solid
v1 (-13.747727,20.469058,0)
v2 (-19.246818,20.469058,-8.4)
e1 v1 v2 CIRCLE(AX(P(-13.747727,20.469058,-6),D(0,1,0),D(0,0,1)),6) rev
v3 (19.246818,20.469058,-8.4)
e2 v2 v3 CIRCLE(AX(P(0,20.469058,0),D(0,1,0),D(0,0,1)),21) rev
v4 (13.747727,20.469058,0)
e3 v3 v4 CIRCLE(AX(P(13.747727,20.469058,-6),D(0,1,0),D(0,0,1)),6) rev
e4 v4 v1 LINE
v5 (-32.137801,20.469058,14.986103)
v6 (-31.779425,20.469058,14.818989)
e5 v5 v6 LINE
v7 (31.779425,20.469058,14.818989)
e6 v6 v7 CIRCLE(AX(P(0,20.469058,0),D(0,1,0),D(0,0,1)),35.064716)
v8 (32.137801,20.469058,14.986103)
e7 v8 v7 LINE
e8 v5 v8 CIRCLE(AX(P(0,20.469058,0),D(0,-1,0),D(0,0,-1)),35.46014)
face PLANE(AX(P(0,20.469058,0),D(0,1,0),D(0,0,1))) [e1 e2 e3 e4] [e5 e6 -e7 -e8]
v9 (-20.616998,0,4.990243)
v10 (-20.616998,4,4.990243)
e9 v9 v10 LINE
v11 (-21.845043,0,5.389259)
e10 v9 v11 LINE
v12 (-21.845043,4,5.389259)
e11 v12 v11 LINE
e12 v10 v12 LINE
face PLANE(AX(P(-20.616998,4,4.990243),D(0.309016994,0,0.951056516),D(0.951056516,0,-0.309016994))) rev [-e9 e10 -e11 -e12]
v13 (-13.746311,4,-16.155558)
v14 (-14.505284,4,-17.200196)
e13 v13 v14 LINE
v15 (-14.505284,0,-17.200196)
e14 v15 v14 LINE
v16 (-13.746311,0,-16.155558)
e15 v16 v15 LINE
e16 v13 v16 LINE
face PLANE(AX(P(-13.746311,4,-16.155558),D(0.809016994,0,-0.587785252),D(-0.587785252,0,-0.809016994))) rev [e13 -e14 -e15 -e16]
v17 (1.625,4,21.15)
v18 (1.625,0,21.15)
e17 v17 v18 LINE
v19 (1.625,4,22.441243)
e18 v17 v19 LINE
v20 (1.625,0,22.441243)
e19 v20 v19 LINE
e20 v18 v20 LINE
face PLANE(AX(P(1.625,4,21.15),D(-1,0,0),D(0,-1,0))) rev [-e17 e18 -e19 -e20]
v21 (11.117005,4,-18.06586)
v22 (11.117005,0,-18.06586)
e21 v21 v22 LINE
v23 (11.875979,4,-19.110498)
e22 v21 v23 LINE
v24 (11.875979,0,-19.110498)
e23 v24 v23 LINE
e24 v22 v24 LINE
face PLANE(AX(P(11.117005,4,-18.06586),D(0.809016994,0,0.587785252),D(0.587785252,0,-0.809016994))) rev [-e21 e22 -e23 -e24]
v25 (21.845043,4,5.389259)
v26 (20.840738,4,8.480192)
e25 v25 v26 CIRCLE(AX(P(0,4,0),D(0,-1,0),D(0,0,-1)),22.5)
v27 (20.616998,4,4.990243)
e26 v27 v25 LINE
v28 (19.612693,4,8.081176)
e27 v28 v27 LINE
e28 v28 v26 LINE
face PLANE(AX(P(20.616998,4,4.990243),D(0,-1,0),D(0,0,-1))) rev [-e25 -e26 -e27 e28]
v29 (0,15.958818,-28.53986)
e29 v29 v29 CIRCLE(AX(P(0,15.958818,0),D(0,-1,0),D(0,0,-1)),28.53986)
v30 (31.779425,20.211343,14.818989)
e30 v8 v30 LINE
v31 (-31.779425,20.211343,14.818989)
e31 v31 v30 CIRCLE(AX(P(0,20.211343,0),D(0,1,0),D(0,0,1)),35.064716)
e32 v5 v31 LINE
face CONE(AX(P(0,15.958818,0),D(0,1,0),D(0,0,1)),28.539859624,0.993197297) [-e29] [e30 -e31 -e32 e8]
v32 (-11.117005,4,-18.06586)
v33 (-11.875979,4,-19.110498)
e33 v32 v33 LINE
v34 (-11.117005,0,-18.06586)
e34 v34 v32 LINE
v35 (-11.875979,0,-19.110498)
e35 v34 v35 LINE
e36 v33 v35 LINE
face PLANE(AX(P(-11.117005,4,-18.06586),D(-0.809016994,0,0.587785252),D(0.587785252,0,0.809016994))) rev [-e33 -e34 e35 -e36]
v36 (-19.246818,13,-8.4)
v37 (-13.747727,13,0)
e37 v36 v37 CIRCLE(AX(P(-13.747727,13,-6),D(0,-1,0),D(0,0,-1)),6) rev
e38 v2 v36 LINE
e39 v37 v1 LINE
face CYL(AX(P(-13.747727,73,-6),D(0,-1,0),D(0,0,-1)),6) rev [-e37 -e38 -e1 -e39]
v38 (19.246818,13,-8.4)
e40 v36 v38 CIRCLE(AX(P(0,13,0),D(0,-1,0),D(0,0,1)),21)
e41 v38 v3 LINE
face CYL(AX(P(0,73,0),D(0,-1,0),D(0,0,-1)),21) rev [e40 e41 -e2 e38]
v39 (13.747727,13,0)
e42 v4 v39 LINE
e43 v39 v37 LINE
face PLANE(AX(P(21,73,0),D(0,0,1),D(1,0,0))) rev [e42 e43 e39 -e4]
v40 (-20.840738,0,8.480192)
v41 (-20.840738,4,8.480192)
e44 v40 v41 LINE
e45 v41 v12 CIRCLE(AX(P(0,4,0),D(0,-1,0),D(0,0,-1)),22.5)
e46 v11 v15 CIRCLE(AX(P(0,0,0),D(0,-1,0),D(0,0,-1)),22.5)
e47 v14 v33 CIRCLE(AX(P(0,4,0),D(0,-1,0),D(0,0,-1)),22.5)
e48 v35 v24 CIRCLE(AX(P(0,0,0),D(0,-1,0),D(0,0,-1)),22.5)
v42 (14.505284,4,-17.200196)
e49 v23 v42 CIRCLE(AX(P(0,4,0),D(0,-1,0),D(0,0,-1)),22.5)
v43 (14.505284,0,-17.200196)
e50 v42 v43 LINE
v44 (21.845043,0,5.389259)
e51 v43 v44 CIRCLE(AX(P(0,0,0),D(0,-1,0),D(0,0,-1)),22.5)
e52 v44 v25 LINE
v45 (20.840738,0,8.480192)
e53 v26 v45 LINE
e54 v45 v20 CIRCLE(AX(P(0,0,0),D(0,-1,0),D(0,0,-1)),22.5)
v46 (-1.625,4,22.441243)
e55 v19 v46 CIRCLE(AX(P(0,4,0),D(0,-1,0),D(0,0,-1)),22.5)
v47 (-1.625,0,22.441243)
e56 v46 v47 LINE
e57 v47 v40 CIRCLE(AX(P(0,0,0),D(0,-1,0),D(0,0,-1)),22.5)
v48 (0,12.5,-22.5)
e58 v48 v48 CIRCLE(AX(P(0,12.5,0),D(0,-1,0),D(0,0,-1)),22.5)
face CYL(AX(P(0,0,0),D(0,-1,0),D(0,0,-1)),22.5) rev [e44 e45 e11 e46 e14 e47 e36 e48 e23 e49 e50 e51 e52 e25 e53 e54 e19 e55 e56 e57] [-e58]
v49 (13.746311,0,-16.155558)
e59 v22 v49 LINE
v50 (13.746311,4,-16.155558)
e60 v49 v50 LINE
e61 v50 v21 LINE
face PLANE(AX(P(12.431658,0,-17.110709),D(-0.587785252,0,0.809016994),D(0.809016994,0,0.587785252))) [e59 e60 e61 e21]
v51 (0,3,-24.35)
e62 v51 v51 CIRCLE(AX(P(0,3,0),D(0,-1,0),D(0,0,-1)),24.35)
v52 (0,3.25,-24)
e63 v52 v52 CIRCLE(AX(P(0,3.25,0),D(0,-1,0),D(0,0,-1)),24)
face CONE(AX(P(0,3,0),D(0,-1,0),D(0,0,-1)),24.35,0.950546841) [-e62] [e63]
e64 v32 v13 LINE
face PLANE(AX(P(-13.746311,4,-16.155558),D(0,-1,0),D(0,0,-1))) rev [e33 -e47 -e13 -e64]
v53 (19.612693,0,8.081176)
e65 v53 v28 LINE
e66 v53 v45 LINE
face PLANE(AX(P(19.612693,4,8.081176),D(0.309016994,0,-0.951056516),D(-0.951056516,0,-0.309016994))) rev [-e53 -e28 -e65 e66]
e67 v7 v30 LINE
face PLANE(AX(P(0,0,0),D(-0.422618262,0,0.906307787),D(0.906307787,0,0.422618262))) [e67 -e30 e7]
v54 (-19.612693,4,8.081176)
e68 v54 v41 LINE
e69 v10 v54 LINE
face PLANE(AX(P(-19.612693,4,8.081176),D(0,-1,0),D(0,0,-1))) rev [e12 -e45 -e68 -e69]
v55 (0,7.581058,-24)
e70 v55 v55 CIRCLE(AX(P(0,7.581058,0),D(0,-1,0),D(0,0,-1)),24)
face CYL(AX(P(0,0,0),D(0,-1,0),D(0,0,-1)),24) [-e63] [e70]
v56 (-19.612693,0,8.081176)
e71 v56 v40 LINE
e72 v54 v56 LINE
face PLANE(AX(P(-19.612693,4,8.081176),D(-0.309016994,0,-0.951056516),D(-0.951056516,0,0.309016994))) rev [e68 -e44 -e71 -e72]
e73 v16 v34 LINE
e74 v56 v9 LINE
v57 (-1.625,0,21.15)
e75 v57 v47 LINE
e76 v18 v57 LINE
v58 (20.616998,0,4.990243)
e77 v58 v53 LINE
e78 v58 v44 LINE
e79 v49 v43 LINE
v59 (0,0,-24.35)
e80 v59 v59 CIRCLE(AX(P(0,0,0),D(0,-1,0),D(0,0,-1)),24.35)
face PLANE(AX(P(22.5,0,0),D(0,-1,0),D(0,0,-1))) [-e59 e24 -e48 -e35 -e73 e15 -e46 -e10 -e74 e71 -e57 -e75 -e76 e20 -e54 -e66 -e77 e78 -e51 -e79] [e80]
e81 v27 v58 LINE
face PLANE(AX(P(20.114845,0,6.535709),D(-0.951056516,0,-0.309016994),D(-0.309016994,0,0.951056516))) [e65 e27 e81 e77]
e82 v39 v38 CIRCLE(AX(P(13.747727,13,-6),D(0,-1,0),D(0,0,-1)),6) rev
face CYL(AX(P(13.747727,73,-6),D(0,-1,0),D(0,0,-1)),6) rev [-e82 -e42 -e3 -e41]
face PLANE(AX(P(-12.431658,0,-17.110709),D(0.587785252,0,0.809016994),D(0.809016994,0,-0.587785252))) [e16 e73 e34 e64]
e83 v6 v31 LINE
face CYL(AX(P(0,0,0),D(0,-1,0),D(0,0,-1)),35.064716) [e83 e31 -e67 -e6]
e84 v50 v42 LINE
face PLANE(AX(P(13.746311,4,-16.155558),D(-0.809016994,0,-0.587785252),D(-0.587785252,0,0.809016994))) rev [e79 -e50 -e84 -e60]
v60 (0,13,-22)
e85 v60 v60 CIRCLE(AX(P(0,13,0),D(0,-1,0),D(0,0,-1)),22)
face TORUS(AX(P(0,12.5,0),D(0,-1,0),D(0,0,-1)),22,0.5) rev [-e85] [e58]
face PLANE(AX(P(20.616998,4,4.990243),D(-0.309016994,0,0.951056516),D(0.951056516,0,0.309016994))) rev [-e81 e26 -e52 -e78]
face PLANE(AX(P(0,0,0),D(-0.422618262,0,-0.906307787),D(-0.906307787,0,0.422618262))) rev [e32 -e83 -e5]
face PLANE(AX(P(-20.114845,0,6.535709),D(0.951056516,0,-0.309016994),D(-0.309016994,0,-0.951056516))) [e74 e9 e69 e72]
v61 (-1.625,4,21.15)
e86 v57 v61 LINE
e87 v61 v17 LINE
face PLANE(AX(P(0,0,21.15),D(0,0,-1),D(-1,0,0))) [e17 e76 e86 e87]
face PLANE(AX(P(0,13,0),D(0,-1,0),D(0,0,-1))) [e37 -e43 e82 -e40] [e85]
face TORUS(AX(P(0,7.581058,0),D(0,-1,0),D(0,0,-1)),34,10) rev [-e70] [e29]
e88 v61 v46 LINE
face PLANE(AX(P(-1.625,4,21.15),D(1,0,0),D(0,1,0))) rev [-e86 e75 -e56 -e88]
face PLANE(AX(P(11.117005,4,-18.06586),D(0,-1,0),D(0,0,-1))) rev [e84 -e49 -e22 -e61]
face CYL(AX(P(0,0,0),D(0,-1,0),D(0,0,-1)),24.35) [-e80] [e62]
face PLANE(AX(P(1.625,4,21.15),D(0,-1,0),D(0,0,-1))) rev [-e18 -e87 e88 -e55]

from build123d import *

# Parameters (mm, degrees)
CUT_EXTRUDE3_DEPTH           = 60
CUT_EXTRUDE5_DEPTH           = 2
CUT_EXTRUDE5_DEPTH_BACK      = 30
SKETCH9_R                    = 38
SKETCH9_R_2                  = 23
SKETCH19_W                   = 12
SKETCH19_H                   = 36.5
CUT_REVOLVE2_ANGLE           = 65
CUT_REVOLVE2_OTHER_WAY_ANGLE = 65
SKETCH21_W                   = 3.25
SKETCH21_H                   = 4
BOSS_EXTRUDE3_DEPTH          = 1.35
CIRPATTERN1_COUNT            = 5
CUT_EXTRUDE9_START           = -5
CUT_EXTRUDE9_DEPTH           = 5
SKETCH23_R                   = 10.5
CUT_EXTRUDE10_DEPTH          = 10
SKETCH24_W                   = 17
SKETCH24_H                   = 12
BOSS_EXTRUDE4_DEPTH          = 8
SKETCH26_W                   = 12
SKETCH26_H                   = 8
CUT_EXTRUDE11_DEPTH          = 10
SKETCH27_W                   = 4
SKETCH27_H                   = 5
CUT_EXTRUDE12_DEPTH          = 5
CUT_EXTRUDE14_DEPTH          = 2
CUT_EXTRUDE14_DEPTH_BACK     = 30
SKETCH29_R                   = 1
CUT_EXTRUDE15_DEPTH          = 15
FILLET1_R                    = 6
FILLET2_R                    = 8
SKETCH30_W                   = 97.703590575
SKETCH30_H                   = 5
CUT_EXTRUDE16_DEPTH          = 5
INTERSECT1_START             = 20.469057744
INTERSECT1_DEPTH             = 42.958818353


# Read off the part's stored shape, not the designer's step: Cut-Extrude9, Intersect1
with BuildPart() as part:
    # Sketch1 → Revolve1 (revolve)
    with BuildSketch(Plane.XY, mode=Mode.PRIVATE) as revolve1_sk:
        with BuildLine():
            Line((0, 63.427876097), (32, 63.427876097))
            ThreePointArc((32, 63.427876097), (37.656854249, 61.084730346), (40, 55.427876097))
            Line((40, 55.427876097), (40, 28.846818009))
            ThreePointArc((40, 28.846818009), (38.792081772, 24.082439968), (35.460140376, 20.469057744))
            Line((35.460140376, 20.469057744), (28.539859624, 15.958818353))
            ThreePointArc((28.539859624, 15.958818353), (25.207918228, 12.345436129), (24, 7.581058088))
            Line((24, 7.581058088), (24, 3.25))
            Line((24, 3.25), (24.35, 3))
            Line((24.35, 3), (24.35, 0))
            Line((24.35, 0), (22.5, 0))
            Line((22.5, 0), (22.5, 12.5))
            ThreePointArc((22.5, 12.5), (22.353553391, 12.853553391), (22, 13))
            Line((22, 13), (0, 13))
            Line((0, 13), (0, 63.427876097))
        make_face()
    revolve(revolve1_sk.sketch.rotate(Axis((0, 0, 0), (0, 1, 0)), 90), axis=Axis((0, 0, 0), (0, 1, 0)))

    # Sketch11 → Cut-Extrude3 (cut)
    with BuildSketch(Plane(origin=(0, 13, 0), x_dir=(-1, 0, 0), z_dir=(0, -1, 0))):
        with BuildLine():
            Line((-21, 0), (21, 0))
            ThreePointArc((21, 0), (0, 21), (-21, 0))
        make_face()
    extrude(amount=-CUT_EXTRUDE3_DEPTH, mode=Mode.SUBTRACT)

    # Sketch9 → Cut-Extrude5 (cut, two sides: drawn at the far end of the back side and taken through both)
    with BuildSketch(Plane(origin=(0, 55.427876097, 0), x_dir=(1, 0, 0), z_dir=(0, 1, 0)).offset(-CUT_EXTRUDE5_DEPTH_BACK)):
        with Locations(Location((0, 0, 0), (0, 0, 270))):
            Circle(SKETCH9_R)
        with Locations(Location((0, 0, 0), (0, 0, 270))):
            Circle(SKETCH9_R_2, mode=Mode.SUBTRACT)
    extrude(amount=CUT_EXTRUDE5_DEPTH + CUT_EXTRUDE5_DEPTH_BACK, mode=Mode.SUBTRACT)

    # Sketch19 → Cut-Revolve2 (revolve, cut)
    with BuildSketch(Plane(origin=(0, 0, 0), x_dir=(0, 0, -1), z_dir=(1, 0, 0))):
        with Locations((-41.064715832, 37.177876097)):
            Rectangle(SKETCH19_W, SKETCH19_H)
    revolve(axis=Axis((0, 0, 0), (0, 1, 0)), revolution_arc=CUT_REVOLVE2_ANGLE, mode=Mode.SUBTRACT)

    # Sketch19 → Cut-Revolve2 other way (revolve, cut)
    with BuildSketch(Plane(origin=(0, 0, 0), x_dir=(0, 0, -1), z_dir=(1, 0, 0))):
        with Locations((-41.064715832, 37.177876097)):
            Rectangle(SKETCH19_W, SKETCH19_H)
    revolve(axis=Axis((0, 0, 0), (0, -1, 0)), revolution_arc=CUT_REVOLVE2_OTHER_WAY_ANGLE, mode=Mode.SUBTRACT)

    # Sketch21 → Boss-Extrude3 (add)
    with BuildSketch(Plane(origin=(0, 0, 22.5), x_dir=(-1, 0, 0), z_dir=(0, 0, -1))):
        with Locations((0, 2)):
            Rectangle(SKETCH21_W, SKETCH21_H)
    boss_extrude3 = extrude(amount=BOSS_EXTRUDE3_DEPTH)

    # CirPattern1: Boss-Extrude3 ×5 about axis
    cirpattern1_axis = Axis((0, 0, 0), (0, 1, 0))
    for i in range(1, CIRPATTERN1_COUNT):
        add(boss_extrude3.rotate(cirpattern1_axis, i * 360 / CIRPATTERN1_COUNT))

    # Cut-Extrude9 outline → Cut-Extrude9 (cut)
    with BuildSketch(Plane(origin=(0, 63.427876097, 0), x_dir=(1, 0, 0), z_dir=(0, 1, 0)).offset(CUT_EXTRUDE9_START)):
        with BuildLine():
            ThreePointArc((40, 0), (0, 40), (-40, 0))
            Line((-40, 0), (-21, 0))
            ThreePointArc((-21, 0), (0, 21), (21, 0))
            Line((21, 0), (40, 0))
        make_face()
    extrude(amount=CUT_EXTRUDE9_DEPTH, mode=Mode.SUBTRACT)

    # Sketch23 → Cut-Extrude10 (cut)
    with BuildSketch(Plane(origin=(0, 0, -40), x_dir=(-1, 0, 0), z_dir=(0, 0, -1))):
        with Locations((0, 42.137876097)):
            Circle(SKETCH23_R)
    extrude(amount=-CUT_EXTRUDE10_DEPTH, mode=Mode.SUBTRACT)

    # Sketch24 → Boss-Extrude4 (add)
    with BuildSketch(Plane(origin=(0, 58.427876097, 0), x_dir=(1, 0, 0), z_dir=(0, 1, 0))):
        with Locations((0, 30)):
            Rectangle(SKETCH24_W, SKETCH24_H)
    extrude(amount=-BOSS_EXTRUDE4_DEPTH)

    # Sketch26 → Cut-Extrude11 (cut)
    with BuildSketch(Plane(origin=(0, 58.427876097, 0), x_dir=(1, 0, 0), z_dir=(0, 1, 0))):
        with Locations((0, 30)):
            Rectangle(SKETCH26_W, SKETCH26_H)
    extrude(amount=-CUT_EXTRUDE11_DEPTH, mode=Mode.SUBTRACT)

    # Sketch27 → Cut-Extrude12 (cut)
    with BuildSketch(Plane(origin=(8.5, 0, 0), x_dir=(0, 0, -1), z_dir=(1, 0, 0))):
        with Locations((29.5, 53.927876097)):
            Rectangle(SKETCH27_W, SKETCH27_H)
    extrude(amount=-CUT_EXTRUDE12_DEPTH, mode=Mode.SUBTRACT)

    # Sketch28 → Cut-Extrude14 (cut, two sides: drawn at the far end of the back side and taken through both)
    with BuildSketch(Plane(origin=(0, 55.427876097, 0), x_dir=(1, 0, 0), z_dir=(0, 1, 0)).offset(-CUT_EXTRUDE14_DEPTH_BACK)):
        with BuildLine():
            Line((-22.912878475, -2), (22.912878475, -2))
            ThreePointArc((22.912878475, -2), (0, -23), (-22.912878475, -2))
        make_face()
    extrude(amount=CUT_EXTRUDE14_DEPTH + CUT_EXTRUDE14_DEPTH_BACK, mode=Mode.SUBTRACT)

    # Sketch29 → Cut-Extrude15 (cut)
    with BuildSketch(Plane(origin=(0, 0, 0), x_dir=(-1, 0, 0), z_dir=(0, 0, -1))):
        with Locations((-30.416198487, 60.927876097)):
            Circle(SKETCH29_R)
        with Locations((30.416198487, 60.927876097)):
            Circle(SKETCH29_R)
        with Locations((0, 60.927876097)):
            Circle(SKETCH29_R)
    extrude(amount=-CUT_EXTRUDE15_DEPTH, mode=Mode.SUBTRACT)

    # Fillet1
    fillet1_edges = [part.edges().sort_by_distance(p)[0] for p in [
        (21, 35.713938048, 0),
        (-21, 35.713938048, 0),
    ]]
    fillet(fillet1_edges, radius=FILLET1_R)

    # Fillet2
    fillet2_edges = [part.edges().sort_by_distance(p)[0] for p in [
        (-22.912878475, 41.427876097, 2),
        (22.912878475, 41.427876097, 2),
    ]]
    fillet(fillet2_edges, radius=FILLET2_R)

    # Sketch30 → Cut-Extrude16 (cut)
    with BuildSketch(Plane(origin=(0, 63.427876097, 0), x_dir=(1, 0, 0), z_dir=(0, 1, 0))):
        with Locations((-0.528699084, -2.5)):
            Rectangle(SKETCH30_W, SKETCH30_H)
    extrude(amount=-CUT_EXTRUDE16_DEPTH, mode=Mode.SUBTRACT)

    # Intersect1 outline → Intersect1 (cut)
    with BuildSketch(Plane(origin=(0, 0, 0), x_dir=(1, 0, 0), z_dir=(0, 1, 0)).offset(INTERSECT1_START)):
        with BuildLine():
            Line((-37.080992435, -15), (-42, -15))
            Line((-42, -15), (-42, -42))
            Line((-42, -42), (42, -42))
            Line((42, -42), (42, -15))
            Line((42, -15), (37.080992435, -15))
            ThreePointArc((37.080992435, -15), (0, 40), (-37.080992435, -15))
        make_face()
        with BuildLine():
            Line((13.747727085, 0), (-13.747727085, 0))
            ThreePointArc((-13.747727085, 0), (-18.767687244, 2.713664655), (-19.246817919, 8.4))
            ThreePointArc((-19.246817919, 8.4), (0, 21), (19.246817919, 8.4))
            ThreePointArc((19.246817919, 8.4), (18.767687244, 2.713664655), (13.747727085, 0))
        make_face(mode=Mode.SUBTRACT)
    extrude(amount=INTERSECT1_DEPTH, mode=Mode.SUBTRACT)


solid = part.part
